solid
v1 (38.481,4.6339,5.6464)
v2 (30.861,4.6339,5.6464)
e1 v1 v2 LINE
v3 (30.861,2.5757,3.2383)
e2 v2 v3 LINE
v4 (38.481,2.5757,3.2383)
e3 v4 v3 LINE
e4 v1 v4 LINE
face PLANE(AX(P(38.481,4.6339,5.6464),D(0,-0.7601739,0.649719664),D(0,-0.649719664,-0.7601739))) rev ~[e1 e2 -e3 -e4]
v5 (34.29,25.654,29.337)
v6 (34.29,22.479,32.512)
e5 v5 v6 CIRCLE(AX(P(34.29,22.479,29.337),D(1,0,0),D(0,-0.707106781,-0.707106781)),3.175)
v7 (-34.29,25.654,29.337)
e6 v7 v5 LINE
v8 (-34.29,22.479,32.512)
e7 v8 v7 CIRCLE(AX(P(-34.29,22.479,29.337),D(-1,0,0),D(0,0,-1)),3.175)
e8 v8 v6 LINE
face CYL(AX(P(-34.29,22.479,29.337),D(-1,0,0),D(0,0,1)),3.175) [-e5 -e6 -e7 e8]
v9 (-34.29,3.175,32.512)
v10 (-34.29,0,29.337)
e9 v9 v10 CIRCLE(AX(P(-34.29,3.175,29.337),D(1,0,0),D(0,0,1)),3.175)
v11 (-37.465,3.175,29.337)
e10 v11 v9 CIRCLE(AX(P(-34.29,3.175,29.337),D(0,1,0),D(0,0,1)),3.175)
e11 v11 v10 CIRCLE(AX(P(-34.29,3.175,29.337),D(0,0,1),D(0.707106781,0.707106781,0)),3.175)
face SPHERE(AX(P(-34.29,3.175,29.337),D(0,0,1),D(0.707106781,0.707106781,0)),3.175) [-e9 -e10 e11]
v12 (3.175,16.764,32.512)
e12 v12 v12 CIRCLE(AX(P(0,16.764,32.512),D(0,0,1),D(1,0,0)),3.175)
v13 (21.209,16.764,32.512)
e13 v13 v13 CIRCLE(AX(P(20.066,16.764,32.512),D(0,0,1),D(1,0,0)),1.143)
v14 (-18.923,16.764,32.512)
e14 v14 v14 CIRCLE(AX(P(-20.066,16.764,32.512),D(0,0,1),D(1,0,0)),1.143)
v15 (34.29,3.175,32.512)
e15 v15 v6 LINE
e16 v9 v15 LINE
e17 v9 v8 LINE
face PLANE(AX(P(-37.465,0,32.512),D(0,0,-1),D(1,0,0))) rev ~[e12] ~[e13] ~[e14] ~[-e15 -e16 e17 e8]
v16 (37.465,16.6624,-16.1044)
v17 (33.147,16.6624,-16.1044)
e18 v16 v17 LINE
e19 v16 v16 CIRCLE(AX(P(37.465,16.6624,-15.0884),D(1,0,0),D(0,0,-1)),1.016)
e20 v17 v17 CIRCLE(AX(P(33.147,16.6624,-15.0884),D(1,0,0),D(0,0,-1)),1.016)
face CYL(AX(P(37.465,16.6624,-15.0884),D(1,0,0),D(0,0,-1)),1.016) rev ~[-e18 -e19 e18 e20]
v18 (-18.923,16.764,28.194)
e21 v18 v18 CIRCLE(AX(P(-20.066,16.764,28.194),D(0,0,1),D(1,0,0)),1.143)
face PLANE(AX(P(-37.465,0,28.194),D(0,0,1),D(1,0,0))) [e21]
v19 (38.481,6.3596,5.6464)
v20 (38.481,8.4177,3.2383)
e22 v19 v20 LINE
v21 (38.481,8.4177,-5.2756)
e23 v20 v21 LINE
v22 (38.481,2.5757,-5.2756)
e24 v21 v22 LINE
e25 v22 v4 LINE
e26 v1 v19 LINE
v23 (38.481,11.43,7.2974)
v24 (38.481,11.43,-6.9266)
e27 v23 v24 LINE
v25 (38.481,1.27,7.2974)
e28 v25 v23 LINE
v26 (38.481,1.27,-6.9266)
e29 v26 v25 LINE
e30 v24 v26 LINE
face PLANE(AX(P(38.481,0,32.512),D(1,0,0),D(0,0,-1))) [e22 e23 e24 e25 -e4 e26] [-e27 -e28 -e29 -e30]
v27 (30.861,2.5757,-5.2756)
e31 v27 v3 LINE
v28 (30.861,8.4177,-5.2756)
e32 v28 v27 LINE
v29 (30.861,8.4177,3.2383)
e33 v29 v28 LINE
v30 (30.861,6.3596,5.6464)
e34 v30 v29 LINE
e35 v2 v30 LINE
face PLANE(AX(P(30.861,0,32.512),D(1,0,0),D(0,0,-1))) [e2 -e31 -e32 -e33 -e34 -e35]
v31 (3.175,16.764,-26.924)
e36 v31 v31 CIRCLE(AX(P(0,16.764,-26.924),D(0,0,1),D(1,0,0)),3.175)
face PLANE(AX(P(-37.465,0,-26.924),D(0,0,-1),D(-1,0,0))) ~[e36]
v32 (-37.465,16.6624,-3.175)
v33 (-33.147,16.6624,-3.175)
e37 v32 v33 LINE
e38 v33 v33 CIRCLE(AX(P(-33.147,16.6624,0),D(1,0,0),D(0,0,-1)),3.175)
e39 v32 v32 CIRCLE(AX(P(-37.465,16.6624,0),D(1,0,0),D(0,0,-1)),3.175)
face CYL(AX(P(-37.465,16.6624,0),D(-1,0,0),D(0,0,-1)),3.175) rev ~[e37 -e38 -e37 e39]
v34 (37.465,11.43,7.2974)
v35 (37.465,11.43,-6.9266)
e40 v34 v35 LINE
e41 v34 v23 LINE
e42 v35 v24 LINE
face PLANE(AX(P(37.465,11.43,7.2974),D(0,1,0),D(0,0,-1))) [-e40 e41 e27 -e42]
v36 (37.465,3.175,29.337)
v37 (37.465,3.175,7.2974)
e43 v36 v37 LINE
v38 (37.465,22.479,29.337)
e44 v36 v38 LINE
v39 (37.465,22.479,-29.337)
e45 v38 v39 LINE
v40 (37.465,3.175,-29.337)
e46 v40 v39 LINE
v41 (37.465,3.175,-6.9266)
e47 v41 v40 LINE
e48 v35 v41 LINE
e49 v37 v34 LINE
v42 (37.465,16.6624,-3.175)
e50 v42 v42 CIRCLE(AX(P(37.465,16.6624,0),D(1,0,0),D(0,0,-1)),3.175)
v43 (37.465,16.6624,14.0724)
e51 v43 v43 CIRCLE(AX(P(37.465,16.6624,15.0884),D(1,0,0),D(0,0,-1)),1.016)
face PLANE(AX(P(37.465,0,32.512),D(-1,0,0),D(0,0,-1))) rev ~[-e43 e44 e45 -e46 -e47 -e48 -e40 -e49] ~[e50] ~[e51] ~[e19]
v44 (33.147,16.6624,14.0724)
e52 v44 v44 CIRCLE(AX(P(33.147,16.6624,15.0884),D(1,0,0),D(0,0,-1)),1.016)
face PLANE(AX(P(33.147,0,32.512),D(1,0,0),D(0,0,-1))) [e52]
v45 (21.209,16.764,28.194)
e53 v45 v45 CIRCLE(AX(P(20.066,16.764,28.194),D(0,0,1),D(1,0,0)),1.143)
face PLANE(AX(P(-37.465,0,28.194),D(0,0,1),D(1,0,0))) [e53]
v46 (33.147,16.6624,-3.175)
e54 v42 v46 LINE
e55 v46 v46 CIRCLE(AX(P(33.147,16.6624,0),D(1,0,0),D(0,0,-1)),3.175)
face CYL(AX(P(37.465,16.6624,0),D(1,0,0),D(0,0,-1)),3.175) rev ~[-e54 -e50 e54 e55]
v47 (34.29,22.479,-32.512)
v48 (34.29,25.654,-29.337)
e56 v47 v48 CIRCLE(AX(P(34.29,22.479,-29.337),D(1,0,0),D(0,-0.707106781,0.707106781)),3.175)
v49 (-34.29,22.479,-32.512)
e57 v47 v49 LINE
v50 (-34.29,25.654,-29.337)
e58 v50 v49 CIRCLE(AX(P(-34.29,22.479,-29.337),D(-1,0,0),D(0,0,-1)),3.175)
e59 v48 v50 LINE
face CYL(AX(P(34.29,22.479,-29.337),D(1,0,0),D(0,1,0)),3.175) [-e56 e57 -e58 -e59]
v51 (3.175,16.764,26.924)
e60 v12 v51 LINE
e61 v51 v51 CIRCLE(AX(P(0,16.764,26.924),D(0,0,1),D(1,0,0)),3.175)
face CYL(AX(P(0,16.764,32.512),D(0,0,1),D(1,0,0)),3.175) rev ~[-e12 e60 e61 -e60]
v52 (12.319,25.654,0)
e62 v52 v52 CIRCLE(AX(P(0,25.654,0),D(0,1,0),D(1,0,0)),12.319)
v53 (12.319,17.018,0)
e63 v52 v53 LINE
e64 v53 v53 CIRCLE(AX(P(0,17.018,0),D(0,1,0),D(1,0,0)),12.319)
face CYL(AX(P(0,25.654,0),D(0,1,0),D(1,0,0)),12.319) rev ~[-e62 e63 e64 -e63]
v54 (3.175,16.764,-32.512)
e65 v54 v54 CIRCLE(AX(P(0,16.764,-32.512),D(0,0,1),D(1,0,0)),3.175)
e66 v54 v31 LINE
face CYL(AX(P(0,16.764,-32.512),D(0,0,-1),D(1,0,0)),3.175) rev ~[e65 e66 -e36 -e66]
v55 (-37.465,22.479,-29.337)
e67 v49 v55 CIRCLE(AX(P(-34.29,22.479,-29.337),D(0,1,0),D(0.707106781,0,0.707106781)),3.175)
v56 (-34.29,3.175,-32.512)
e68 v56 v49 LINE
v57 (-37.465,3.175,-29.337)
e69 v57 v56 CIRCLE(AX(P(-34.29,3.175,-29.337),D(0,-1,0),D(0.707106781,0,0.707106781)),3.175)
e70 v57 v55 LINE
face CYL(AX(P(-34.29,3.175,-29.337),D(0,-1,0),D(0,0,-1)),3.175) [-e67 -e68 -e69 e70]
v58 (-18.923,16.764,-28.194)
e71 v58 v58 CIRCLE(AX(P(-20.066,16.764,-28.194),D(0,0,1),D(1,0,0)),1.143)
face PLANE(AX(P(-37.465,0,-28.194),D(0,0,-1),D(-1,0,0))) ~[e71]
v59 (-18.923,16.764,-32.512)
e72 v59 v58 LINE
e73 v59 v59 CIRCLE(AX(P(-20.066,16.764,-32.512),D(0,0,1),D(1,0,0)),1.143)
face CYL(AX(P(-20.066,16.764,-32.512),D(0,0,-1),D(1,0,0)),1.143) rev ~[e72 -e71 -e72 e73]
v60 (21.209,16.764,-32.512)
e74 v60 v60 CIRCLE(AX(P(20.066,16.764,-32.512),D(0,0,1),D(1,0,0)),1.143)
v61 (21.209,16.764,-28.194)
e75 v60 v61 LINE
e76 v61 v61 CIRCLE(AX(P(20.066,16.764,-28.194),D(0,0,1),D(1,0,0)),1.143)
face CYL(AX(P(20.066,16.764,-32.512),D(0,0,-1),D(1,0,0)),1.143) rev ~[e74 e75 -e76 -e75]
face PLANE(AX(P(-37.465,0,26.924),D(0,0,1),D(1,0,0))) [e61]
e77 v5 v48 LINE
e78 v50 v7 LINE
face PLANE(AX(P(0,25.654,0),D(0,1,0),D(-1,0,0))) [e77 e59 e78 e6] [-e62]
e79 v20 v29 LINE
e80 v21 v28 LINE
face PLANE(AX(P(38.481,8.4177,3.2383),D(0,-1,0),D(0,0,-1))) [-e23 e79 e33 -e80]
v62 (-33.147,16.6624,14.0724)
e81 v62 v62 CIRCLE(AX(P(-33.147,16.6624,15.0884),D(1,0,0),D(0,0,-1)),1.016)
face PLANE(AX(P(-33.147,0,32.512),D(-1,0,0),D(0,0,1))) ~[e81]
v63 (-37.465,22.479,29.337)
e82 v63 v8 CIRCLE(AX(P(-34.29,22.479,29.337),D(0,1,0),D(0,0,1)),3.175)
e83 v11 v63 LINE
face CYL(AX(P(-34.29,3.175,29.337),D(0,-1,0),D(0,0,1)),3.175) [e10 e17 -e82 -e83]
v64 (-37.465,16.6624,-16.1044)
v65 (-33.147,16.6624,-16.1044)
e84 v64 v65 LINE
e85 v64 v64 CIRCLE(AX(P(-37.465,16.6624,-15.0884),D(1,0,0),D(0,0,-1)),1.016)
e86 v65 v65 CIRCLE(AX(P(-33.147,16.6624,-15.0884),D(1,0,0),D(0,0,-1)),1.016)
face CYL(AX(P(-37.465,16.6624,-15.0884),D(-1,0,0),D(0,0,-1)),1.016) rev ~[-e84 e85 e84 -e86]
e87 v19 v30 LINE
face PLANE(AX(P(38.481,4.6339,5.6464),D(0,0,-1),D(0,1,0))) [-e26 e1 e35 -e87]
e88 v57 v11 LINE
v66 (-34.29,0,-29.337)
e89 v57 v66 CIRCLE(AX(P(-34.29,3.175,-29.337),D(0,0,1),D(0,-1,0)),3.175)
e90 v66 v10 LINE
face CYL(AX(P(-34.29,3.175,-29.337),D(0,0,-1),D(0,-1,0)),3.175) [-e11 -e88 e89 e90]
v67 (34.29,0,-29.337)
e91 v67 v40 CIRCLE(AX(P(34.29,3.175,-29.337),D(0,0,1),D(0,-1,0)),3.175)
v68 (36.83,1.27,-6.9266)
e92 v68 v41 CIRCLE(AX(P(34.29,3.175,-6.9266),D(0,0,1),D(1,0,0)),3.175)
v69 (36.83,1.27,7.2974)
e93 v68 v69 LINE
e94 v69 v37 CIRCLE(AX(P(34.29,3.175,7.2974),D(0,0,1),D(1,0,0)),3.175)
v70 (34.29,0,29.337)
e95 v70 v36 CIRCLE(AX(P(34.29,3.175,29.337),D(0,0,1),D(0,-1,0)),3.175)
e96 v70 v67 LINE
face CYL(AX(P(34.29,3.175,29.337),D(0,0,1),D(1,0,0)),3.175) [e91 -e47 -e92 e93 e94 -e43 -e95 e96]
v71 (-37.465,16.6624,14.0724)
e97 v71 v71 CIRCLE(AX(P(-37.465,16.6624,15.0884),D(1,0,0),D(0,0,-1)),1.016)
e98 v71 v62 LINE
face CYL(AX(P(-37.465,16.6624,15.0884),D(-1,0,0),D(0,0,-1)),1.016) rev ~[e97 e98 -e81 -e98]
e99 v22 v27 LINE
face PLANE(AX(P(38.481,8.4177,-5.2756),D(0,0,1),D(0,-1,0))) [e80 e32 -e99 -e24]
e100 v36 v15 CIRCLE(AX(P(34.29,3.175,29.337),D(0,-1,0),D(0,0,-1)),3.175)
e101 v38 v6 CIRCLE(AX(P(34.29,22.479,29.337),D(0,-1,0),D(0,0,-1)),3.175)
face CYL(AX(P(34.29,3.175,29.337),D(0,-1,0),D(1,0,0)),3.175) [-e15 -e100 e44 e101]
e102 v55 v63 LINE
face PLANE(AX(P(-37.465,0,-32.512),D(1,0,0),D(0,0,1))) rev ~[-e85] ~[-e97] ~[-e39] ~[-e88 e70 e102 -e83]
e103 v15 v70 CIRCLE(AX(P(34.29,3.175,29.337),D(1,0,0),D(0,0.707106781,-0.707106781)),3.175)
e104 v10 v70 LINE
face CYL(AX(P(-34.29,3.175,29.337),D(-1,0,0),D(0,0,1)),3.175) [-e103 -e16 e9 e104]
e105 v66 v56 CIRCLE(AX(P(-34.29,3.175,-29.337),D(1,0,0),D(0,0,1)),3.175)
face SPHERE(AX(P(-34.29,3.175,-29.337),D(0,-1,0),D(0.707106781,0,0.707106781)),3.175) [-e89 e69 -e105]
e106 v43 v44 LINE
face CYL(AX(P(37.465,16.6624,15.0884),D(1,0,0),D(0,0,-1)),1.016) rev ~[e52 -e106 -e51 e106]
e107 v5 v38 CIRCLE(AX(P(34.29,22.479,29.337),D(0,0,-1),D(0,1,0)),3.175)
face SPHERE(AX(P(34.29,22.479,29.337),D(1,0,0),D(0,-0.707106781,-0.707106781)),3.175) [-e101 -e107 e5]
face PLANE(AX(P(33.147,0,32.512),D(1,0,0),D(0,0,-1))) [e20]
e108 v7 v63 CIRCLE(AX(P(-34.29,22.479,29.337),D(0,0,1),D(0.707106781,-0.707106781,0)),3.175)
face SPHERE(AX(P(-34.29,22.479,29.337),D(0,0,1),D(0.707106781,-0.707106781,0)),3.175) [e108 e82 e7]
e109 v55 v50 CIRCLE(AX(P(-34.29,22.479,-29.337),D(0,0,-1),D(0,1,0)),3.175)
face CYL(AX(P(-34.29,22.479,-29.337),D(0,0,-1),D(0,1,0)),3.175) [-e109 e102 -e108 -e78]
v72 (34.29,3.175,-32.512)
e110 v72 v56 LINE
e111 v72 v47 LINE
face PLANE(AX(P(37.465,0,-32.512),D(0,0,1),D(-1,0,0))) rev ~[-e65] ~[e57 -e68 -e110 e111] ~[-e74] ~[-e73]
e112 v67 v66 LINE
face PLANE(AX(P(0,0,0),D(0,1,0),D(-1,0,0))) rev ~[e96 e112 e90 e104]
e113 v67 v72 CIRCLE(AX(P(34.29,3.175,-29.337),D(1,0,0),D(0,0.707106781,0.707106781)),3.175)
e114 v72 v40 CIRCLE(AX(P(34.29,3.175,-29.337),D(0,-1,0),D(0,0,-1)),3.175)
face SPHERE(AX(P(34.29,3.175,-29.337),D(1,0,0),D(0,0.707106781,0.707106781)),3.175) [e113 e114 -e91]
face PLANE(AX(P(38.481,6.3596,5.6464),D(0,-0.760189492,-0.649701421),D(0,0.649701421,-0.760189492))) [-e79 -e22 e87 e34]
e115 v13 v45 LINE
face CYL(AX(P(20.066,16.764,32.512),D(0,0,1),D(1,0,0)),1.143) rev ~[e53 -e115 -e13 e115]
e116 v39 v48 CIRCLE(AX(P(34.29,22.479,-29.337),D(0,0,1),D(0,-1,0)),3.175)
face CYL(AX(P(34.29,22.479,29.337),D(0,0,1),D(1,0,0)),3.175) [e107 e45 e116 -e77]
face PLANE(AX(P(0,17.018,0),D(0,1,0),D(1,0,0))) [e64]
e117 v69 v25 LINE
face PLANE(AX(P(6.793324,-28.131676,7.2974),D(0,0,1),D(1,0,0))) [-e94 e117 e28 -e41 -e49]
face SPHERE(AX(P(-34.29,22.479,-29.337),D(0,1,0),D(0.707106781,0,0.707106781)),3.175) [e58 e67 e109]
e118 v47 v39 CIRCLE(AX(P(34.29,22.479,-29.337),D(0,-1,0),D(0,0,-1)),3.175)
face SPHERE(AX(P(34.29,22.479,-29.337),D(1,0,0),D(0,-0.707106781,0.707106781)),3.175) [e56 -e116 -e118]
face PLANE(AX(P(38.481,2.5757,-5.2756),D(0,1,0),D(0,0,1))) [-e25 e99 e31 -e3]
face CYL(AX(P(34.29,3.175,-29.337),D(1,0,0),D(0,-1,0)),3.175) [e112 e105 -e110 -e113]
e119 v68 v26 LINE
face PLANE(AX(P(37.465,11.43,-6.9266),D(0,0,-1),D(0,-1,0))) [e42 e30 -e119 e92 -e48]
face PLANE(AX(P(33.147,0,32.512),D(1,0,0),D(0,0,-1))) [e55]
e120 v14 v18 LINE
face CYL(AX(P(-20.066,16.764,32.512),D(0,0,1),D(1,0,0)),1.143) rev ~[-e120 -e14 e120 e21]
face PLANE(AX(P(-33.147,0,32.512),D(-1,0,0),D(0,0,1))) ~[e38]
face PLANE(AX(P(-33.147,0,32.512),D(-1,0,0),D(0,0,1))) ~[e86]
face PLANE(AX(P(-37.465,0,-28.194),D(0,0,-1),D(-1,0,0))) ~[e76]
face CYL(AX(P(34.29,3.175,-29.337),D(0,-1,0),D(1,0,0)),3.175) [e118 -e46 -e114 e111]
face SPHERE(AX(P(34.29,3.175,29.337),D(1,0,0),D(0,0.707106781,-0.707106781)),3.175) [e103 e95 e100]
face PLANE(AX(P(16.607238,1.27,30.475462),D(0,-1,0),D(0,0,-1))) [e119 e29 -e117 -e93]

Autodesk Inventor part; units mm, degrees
ref_plane "YZ Plane" through (0, 0, 0) normal (1, 0, 0) x (0, 1, 0)
ref_plane "XZ Plane" through (0, 0, 0) normal (0, 1, 0) x (-1, 0, 0)
ref_plane "XY Plane" through (0, 0, 0) normal (0, 0, 1) x (1, 0, 0)
sketch "Sketch1" plane through (0, 0, 0) normal (0, 1, 0) x (-1, 0, 0)
  line L0 (-37.465, -32.512) -> (37.465, -32.512)
  line L1 (37.465, -32.512) -> (37.465, 32.512)
  line L2 (37.465, 32.512) -> (-37.465, 32.512)
  line L3 (-37.465, 32.512) -> (-37.465, -32.512)
  line L4 (-37.465, -32.512) -> (37.465, 32.512) construction
  line L5 (37.465, -32.512) -> (-37.465, 32.512) construction
  point P0 (0, 0)
  point P1 (0, 0)
  dimension "d0" = 74.93
  dimension "d1" = 65.024
extrude "Extrusion1" add sketch "Sketch1" along normal blind 25.654
sketch "Sketch2" plane through (-37.465, 0, 32.512) normal (0, 0, 1) x (1, 0, 0)
  line L0 (74.93, 0) -> (74.93, 25.654) projected
  line L1 (0, 25.654) -> (74.93, 25.654) projected
  line L2 (0, 0) -> (0, 25.654) projected
  circle A0 centre (37.465, 16.764) radius 3.175
  point P0 (37.465, 0)
  dimension "d4" = 6.35
  dimension "d5" = 37.465
  dimension "d6" = 37.465
  dimension "d7" = 8.89
extrude "Extrusion2" cut sketch "Sketch2" against normal blind 5.588
sketch "Sketch3" plane through (-37.465, 0, 32.512) normal (0, 0, 1) x (1, 0, 0)
  circle A0 centre (37.465, 16.764) radius 3.175 projected
  line L0 (74.93, 0) -> (74.93, 25.654) projected
  line L1 (0, 0) -> (0, 25.654) projected
  circle A1 centre (57.531, 16.764) radius 1.143
  line L2 (37.465, 25.654) -> (37.465, 0) construction
  circle A2 centre (17.399, 16.764) radius 1.143
  dimension "d10" = 2.286
  dimension "d11" = 20.066
  dimension "d12" = 20.066
  dimension "d13" = 37.465
  dimension "d14" = 37.465
extrude "Extrusion3" cut sketch "Sketch3" against normal blind 4.318 contours A1 | A2
ref_plane "Work Plane1" through (-37.465, 0, 0) normal (0, 0, 1) x (1, 0, 0)
mirror "Mirror1" about plane through (-37.465, 0, 0) normal (0, 0, 1) of "Extrusion2", "Extrusion3"
ref_plane "Work Plane2" through (0, 0, 32.512) normal (1, 0, 0) x (0, 0, -1)
sketch "Sketch4" plane through (37.465, 0, 32.512) normal (1, 0, 0) x (0, 0, -1)
  line L0 (0, 25.654) -> (65.024, 25.654) projected
  circle A0 centre (32.512, 16.6624) radius 3.175
  circle A1 centre (47.6004, 16.6624) radius 1.016
  line L1 (32.512, 25.654) -> (32.512, 0) construction
  circle A2 centre (17.4236, 16.6624) radius 1.016
  dimension "d19" = 6.35
  dimension "d20" = 8.9916
  dimension "d21" = 2.032
extrude "Extrusion4" cut sketch "Sketch4" against normal blind 4.318
mirror "Mirror2" about plane through (0, 0, 32.512) normal (1, 0, 0) of "Extrusion4"
sketch "Sketch5" plane through (0, 25.654, 0) normal (0, 1, 0) x (1, 0, 0)
  circle A0 centre (0, 0) radius 12.319
  dimension "d24" = 24.638
extrude "Extrusion5" cut sketch "Sketch5" against normal blind 8.636
sketch "Sketch6" plane through (37.465, 0, 32.512) normal (1, 0, 0) x (0, 0, -1)
  line L0 (0, 25.654) -> (65.024, 25.654) projected
  line L1 (25.2146, 11.43) -> (39.4386, 11.43)
  line L2 (39.4386, 11.43) -> (39.4386, 1.27)
  line L3 (39.4386, 1.27) -> (25.2146, 1.27)
  line L4 (25.2146, 1.27) -> (25.2146, 11.43)
  point P0 (32.512, 0)
  dimension "d27" = 14.224
  dimension "d28" = 10.16
  dimension "d29" = 14.224
extrude "Extrusion6" add sketch "Sketch6" along normal blind 1.016
sketch "Sketch7" plane through (38.481, 0, 32.512) normal (1, 0, 0) x (0, 0, -1)
  line L0 (25.2146, 11.43) -> (25.2146, 1.27) projected
  line L1 (39.4386, 1.27) -> (39.4386, 11.43) projected
  line L2 (26.8656, 8.4177) -> (37.7876, 8.4177)
  line L3 (37.7876, 8.4177) -> (37.7876, 2.5757)
  line L4 (37.7876, 2.5757) -> (26.8656, 2.5757)
  line L5 (26.8656, 4.6339) -> (26.8656, 6.3596)
  line L6 (26.8656, 4.6339) -> (29.2737, 2.5757)
  line L7 (26.8656, 5.4967) -> (37.7876, 5.4967) construction
  line L8 (26.8656, 6.3596) -> (29.2737, 8.4177)
  point P0 (32.512, 0)
  dimension "d32" = 5.842
  dimension "d34" = 10.922
  dimension "d35" = 1.651
  dimension "d36" = 1.651
extrude "Extrusion7" cut sketch "Sketch7" against normal blind 7.62
fillet "Fillet1" radius 3.175 12 edges at (0, 25.654, -32.512) (37.465, 12.827, -32.512) (37.465, 25.654, 0) (-37.465, 25.654, 0) (-37.465, 12.827, -32.512) (0, 0, -32.512) (37.465, 0, 0) (-37.465, 0, 0) (0, 0, 32.512) (37.465, 12.827, 32.512) (0, 25.654, 32.512) (-37.465, 12.827, 32.512)
equation "\"d5\" = d6"
equation "\"d12\" = d11"
equation "\"d13\" = d14"
equation "\"d35\" = d36"
properties part number "dragonfly2Camera" material "Aluminum 6061"
